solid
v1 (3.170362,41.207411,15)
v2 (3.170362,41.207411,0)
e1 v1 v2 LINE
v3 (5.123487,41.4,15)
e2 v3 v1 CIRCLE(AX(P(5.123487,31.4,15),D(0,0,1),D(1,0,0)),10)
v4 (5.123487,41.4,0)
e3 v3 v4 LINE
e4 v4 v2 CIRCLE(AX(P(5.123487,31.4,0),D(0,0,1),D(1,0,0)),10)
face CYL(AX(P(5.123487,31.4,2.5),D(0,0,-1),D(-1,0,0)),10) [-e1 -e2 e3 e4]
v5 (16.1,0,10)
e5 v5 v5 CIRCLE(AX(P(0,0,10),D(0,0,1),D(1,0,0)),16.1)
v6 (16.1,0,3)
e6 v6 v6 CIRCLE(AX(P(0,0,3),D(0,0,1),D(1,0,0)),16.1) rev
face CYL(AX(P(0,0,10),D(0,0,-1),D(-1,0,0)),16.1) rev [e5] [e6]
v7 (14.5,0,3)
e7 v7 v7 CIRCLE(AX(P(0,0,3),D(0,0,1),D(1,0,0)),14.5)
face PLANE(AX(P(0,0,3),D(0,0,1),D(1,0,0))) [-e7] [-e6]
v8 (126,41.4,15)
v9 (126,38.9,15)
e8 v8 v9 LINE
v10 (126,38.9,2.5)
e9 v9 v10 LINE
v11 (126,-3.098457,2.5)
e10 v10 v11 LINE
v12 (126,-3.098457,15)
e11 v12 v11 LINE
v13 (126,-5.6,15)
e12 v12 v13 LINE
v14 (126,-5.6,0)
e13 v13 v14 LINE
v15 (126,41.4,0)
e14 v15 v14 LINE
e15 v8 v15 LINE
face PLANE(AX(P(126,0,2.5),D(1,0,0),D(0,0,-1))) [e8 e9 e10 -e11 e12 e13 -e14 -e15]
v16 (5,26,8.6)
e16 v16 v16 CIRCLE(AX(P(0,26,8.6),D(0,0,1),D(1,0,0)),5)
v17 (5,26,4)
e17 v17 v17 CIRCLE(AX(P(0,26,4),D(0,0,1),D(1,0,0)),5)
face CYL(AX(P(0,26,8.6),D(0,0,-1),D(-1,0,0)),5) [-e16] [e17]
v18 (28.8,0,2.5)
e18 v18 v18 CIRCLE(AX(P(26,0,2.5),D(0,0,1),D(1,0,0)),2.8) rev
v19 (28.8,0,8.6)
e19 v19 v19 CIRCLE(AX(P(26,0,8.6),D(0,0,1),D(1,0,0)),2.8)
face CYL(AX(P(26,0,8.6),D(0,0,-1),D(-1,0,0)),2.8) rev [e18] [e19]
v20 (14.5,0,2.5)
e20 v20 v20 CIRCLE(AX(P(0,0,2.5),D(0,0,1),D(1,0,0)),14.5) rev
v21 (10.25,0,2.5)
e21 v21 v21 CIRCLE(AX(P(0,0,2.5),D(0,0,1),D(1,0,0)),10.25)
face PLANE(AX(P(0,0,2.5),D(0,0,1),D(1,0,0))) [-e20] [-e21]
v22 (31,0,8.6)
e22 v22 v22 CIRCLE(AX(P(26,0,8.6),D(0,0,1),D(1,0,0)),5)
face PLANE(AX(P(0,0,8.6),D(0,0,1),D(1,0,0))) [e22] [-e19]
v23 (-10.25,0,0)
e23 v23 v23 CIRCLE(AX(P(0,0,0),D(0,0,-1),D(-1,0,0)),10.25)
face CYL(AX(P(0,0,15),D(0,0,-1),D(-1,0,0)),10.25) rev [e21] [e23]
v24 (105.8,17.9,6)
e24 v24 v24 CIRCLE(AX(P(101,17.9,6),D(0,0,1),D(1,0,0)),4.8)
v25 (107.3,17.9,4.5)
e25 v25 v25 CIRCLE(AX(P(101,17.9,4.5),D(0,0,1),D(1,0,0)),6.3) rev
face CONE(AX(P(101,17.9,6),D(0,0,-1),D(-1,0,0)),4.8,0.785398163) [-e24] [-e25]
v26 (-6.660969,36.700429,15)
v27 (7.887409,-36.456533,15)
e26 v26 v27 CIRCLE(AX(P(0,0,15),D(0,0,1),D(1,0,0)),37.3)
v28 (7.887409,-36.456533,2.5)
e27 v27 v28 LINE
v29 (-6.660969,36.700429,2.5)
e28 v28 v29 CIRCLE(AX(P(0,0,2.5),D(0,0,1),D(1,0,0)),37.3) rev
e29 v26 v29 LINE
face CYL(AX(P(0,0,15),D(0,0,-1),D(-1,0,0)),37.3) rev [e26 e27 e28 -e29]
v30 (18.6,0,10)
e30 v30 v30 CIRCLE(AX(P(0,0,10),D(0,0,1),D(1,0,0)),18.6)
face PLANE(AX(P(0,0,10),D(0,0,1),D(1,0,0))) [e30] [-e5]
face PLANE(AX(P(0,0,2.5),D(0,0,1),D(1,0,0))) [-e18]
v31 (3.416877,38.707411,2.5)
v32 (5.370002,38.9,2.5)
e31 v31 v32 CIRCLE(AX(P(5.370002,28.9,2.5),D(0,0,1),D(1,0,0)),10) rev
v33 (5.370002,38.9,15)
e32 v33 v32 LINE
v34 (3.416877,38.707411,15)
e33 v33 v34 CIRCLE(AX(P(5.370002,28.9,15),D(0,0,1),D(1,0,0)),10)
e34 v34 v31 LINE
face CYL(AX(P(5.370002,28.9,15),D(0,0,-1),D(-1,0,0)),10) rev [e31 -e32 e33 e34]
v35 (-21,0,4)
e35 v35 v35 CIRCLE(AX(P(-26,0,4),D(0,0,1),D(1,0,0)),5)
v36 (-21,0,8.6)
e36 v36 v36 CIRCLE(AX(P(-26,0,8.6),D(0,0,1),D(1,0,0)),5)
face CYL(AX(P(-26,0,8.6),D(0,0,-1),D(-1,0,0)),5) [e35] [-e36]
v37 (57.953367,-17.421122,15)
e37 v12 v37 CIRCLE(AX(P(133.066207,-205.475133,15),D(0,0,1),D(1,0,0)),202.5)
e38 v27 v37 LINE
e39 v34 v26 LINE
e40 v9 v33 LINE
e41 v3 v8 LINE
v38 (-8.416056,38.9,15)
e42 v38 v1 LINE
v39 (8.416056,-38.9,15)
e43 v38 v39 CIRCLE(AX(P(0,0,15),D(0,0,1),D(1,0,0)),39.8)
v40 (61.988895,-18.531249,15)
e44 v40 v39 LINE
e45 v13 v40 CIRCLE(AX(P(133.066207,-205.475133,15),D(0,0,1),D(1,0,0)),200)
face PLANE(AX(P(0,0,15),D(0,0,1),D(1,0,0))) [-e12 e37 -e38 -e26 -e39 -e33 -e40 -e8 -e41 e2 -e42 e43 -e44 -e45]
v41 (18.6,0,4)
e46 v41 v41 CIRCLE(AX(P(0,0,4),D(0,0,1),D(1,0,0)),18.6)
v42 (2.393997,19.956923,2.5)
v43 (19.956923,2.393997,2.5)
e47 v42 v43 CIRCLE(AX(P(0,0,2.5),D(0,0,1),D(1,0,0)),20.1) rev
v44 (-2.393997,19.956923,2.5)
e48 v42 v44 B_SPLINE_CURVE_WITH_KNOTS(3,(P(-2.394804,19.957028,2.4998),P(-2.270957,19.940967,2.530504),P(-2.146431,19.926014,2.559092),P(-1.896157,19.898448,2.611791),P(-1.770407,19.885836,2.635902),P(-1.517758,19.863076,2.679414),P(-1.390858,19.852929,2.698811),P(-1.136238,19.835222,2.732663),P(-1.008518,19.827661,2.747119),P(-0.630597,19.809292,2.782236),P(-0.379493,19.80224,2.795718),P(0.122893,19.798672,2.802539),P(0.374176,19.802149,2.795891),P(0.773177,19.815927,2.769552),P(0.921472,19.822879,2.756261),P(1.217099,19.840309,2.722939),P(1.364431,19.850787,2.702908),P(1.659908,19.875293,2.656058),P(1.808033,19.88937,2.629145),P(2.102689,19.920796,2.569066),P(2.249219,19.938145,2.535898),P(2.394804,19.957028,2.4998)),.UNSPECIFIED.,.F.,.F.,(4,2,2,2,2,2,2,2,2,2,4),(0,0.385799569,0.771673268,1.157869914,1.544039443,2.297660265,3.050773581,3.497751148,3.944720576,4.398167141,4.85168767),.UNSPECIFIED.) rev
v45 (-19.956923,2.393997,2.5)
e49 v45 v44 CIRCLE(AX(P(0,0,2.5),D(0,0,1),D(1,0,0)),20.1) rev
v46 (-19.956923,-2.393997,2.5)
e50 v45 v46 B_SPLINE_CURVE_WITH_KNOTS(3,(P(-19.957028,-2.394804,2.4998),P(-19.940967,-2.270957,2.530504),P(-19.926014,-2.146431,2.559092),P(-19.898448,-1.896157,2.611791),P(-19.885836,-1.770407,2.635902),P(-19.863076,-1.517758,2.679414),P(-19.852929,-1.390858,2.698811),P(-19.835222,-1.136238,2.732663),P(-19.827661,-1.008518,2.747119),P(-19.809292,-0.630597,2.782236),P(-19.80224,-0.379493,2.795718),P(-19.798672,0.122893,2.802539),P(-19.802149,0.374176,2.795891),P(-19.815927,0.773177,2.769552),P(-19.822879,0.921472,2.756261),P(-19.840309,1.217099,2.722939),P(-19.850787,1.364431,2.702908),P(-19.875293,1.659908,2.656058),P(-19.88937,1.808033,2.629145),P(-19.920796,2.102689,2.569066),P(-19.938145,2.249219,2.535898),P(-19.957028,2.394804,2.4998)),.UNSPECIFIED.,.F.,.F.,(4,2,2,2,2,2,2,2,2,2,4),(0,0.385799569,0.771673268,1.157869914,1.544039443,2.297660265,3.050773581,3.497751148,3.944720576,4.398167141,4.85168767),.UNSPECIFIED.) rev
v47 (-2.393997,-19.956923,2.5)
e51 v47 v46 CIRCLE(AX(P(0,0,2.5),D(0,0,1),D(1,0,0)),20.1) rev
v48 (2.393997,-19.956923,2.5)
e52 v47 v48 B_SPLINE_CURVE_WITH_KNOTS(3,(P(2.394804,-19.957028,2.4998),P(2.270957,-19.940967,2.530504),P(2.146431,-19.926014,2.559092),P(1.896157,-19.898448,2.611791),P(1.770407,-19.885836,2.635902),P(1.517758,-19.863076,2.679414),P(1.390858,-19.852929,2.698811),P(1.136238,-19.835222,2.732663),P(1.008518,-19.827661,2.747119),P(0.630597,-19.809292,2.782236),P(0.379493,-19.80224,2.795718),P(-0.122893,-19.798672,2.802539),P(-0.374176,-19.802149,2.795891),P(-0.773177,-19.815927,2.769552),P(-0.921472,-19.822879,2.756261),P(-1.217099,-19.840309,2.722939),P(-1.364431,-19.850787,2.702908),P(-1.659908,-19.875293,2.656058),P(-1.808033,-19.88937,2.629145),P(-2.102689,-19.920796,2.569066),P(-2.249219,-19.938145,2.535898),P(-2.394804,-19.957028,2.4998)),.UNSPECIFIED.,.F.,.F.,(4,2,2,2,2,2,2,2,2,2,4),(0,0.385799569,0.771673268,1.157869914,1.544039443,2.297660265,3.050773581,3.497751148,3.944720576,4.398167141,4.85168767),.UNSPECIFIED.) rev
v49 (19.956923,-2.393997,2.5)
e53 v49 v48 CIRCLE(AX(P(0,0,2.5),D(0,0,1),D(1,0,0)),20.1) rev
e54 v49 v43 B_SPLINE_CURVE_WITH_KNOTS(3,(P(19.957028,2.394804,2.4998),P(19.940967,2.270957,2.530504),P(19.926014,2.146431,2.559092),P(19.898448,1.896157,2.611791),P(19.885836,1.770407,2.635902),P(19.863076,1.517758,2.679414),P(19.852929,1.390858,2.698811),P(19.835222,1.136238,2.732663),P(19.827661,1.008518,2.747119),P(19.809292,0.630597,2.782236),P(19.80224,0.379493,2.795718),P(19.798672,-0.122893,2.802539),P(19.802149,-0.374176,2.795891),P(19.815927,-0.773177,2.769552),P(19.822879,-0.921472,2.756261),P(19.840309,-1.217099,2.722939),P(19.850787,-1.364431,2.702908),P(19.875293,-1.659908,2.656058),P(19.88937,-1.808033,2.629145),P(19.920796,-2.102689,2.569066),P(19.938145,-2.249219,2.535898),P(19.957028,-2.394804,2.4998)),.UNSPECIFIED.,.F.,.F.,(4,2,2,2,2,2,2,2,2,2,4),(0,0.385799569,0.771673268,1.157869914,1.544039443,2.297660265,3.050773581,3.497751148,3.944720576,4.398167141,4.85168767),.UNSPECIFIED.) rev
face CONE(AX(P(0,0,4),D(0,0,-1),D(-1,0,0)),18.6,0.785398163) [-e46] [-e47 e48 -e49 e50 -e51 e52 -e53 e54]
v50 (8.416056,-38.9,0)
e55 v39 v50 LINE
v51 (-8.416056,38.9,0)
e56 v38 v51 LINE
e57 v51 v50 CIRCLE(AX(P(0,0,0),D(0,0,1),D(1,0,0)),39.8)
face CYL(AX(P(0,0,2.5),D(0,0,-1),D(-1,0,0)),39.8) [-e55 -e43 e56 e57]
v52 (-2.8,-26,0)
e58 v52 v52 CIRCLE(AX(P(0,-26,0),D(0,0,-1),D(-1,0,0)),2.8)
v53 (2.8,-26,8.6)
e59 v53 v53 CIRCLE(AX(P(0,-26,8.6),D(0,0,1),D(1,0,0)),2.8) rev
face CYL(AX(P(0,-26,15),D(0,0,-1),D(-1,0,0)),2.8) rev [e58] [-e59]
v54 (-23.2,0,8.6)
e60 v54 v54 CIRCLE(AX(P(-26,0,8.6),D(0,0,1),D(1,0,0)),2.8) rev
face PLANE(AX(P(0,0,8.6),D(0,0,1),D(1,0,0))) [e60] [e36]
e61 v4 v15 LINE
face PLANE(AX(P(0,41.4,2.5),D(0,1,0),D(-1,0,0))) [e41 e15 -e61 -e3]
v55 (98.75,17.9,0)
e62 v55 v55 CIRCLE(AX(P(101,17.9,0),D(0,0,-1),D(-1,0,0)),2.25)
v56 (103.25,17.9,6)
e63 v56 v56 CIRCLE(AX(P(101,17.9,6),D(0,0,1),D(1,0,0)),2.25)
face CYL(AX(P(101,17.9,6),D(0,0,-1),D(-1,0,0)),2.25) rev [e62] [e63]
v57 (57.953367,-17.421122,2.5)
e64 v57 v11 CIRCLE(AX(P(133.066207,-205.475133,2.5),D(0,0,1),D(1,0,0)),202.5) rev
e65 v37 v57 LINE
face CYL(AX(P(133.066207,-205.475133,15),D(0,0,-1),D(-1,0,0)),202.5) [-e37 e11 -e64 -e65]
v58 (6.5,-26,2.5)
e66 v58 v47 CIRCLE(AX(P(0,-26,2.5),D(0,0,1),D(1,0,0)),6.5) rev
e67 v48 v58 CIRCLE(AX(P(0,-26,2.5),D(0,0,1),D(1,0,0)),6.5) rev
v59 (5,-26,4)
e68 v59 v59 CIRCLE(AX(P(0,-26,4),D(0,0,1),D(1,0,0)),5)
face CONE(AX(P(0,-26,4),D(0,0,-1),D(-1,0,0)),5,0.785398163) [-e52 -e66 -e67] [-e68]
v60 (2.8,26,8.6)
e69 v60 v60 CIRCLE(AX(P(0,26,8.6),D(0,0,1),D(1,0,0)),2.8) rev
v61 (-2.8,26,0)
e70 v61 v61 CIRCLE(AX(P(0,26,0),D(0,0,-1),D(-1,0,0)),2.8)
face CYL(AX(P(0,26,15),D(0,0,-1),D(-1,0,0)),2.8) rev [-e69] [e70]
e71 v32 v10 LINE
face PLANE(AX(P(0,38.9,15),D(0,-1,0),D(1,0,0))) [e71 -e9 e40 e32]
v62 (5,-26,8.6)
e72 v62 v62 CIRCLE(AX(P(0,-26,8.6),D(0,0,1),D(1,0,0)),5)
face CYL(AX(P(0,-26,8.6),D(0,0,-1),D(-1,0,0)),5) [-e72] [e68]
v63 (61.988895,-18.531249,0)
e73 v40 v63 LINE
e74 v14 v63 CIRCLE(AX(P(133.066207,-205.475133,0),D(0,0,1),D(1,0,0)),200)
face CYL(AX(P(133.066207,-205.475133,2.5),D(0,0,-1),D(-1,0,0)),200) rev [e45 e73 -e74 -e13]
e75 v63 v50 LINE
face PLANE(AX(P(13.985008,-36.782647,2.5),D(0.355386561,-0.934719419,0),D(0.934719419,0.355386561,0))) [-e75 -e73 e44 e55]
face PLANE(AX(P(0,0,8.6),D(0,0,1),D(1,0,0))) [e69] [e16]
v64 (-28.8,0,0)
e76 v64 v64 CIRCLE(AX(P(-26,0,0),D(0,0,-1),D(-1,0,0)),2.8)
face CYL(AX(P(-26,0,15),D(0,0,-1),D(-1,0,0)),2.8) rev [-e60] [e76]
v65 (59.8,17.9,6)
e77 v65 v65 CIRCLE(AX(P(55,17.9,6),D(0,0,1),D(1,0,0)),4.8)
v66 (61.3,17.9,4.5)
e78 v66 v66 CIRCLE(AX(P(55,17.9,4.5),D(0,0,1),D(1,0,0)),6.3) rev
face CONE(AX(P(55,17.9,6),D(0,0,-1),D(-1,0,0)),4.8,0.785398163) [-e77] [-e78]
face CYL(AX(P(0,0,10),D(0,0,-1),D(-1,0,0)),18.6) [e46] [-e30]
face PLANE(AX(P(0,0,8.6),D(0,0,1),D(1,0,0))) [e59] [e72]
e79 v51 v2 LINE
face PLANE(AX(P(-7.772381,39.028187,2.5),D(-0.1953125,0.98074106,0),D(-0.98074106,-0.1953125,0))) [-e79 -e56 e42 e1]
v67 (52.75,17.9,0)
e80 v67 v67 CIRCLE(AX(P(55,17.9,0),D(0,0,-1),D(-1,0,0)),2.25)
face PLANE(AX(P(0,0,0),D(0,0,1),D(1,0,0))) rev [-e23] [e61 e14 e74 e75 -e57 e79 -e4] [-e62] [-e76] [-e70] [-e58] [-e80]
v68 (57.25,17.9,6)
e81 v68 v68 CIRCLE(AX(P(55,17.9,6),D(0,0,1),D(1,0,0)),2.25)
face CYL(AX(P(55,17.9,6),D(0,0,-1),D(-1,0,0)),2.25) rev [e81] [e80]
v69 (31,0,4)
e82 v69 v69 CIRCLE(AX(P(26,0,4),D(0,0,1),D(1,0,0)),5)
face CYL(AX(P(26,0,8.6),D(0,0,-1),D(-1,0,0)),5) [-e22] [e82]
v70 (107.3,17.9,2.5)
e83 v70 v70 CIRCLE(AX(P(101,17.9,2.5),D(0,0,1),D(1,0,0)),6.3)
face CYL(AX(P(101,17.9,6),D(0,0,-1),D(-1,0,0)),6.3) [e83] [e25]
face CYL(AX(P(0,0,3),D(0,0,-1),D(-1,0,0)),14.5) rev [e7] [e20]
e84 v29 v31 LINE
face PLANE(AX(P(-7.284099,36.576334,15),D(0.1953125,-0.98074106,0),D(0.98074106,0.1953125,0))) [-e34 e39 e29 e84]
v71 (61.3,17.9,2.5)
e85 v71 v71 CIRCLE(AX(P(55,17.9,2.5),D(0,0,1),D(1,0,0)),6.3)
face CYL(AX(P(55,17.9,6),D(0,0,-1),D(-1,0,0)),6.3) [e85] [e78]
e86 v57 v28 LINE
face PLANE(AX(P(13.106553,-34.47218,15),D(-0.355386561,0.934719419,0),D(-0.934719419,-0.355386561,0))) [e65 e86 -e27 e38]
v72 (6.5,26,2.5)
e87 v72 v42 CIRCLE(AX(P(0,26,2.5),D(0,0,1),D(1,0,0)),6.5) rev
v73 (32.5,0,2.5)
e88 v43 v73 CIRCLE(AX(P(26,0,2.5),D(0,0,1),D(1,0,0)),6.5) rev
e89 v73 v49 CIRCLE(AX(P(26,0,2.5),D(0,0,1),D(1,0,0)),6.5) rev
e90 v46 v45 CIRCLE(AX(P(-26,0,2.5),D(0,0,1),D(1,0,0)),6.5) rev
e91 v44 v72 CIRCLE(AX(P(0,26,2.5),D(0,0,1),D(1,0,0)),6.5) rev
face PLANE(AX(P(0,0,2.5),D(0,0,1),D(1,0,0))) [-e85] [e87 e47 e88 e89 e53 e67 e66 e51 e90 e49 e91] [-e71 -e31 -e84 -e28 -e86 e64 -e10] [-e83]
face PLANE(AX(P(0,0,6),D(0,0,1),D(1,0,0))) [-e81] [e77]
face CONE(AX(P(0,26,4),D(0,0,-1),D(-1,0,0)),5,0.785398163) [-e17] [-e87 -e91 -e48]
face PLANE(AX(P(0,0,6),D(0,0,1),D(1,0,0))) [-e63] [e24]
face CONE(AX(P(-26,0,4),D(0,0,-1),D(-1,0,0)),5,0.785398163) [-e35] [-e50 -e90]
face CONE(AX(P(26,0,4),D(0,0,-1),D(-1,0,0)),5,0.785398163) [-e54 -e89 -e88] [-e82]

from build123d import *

# Parameters (mm, degrees)
ESTRUSIONE_ESTRUSIONE1_DEPTH = 2.5
ESTRUSIONE_ESTRUSIONE2_DEPTH = 15
SCHIZZO2_R                   = 10.25
SCHIZZO2_R_2                 = 2.8
TAGLIO_ESTRUSIONE1_DEPTH     = 15
SCHIZZO3_R                   = 16.1
SCHIZZO3_R_2                 = 14.5
ESTRUSIONE_ESTRUSIONE3_DEPTH = 0.5
SCHIZZO3_3_R                 = 18.6
SCHIZZO3_3_R_2               = 16.1
ESTRUSIONE_ESTRUSIONE4_DEPTH = 7.5
SCHIZZO3_4_R                 = 5
SCHIZZO3_4_R_2               = 2.8
ESTRUSIONE_ESTRUSIONE5_DEPTH = 6.1
SCHIZZO3_5_R                 = 6.3
SCHIZZO3_5_R_2               = 2.25
ESTRUSIONE_ESTRUSIONE6_DEPTH = 3.5
SMUSSO1_SIZE                 = 1.5
FORO_PER_VITE_M4_1_D         = 4.5
FORO_PER_VITE_M4_1_DEPTH     = 50
FORO_PER_VITE_M4_1_TIP       = 1.351936393


with BuildPart() as part:
    # Schizzo1 → Estrusione-Estrusione1 (new body)
    with BuildSketch(Plane.XY):
        with BuildLine():
            Line((5.123487201, 41.4), (126, 41.4))
            Line((126, 41.4), (126, -5.6))
            ThreePointArc((126, -5.6), (93.463092461, -9.435358059), (61.98889523, -18.531249019))
            Line((61.98889523, -18.531249019), (8.416056083, -38.9))
            ThreePointArc((8.416056083, -38.9), (-38.9, -8.416056083), (-8.416056083, 38.9))
            Line((-8.416056083, 38.9), (3.170362201, 41.207410603))
            ThreePointArc((3.170362201, 41.207410603), (4.142188579, 41.351736181), (5.123487201, 41.4))
        make_face()
    extrude(amount=ESTRUSIONE_ESTRUSIONE1_DEPTH)

    # Schizzo1<3> → Estrusione-Estrusione2 (add)
    with BuildSketch(Plane.XY):
        with BuildLine():
            Line((126, 41.4), (5.123487201, 41.4))
            ThreePointArc((5.123487201, 41.4), (4.142188579, 41.351736181), (3.170362201, 41.207410603))
            Line((3.170362201, 41.207410603), (-8.416056083, 38.9))
            ThreePointArc((-8.416056083, 38.9), (-38.9, -8.416056083), (8.416056083, -38.9))
            Line((8.416056083, -38.9), (61.98889523, -18.531249019))
            ThreePointArc((61.98889523, -18.531249019), (93.463092461, -9.435358059), (126, -5.6))
            Line((126, -5.6), (126, -3.098457484))
            ThreePointArc((126, -3.098457484), (91.357291517, -7.317073844), (57.953366675, -17.421121553))
            Line((57.953366675, -17.421121553), (7.887409345, -36.456532663))
            ThreePointArc((7.887409345, -36.456532663), (-36.58362067, -7.275211244), (-6.660968885, 36.700429065))
            Line((-6.660968885, 36.700429065), (3.41687663, 38.707410603))
            ThreePointArc((3.41687663, 38.707410603), (4.388703008, 38.851736181), (5.37000163, 38.9))
            Line((5.37000163, 38.9), (126, 38.9))
            Line((126, 38.9), (126, 41.4))
        make_face()
    extrude(amount=ESTRUSIONE_ESTRUSIONE2_DEPTH)

    # Schizzo2 → Taglio-Estrusione1 (cut)
    with BuildSketch(Plane(origin=(0, 0, 0), x_dir=(-1, 0, 0), z_dir=(0, 0, -1))):
        Circle(SCHIZZO2_R)
        with Locations((0, -26)):
            Circle(SCHIZZO2_R_2)
        with Locations((26, 0)):
            Circle(SCHIZZO2_R_2)
        with Locations((0, 26)):
            Circle(SCHIZZO2_R_2)
    extrude(amount=-TAGLIO_ESTRUSIONE1_DEPTH, mode=Mode.SUBTRACT)

    # Schizzo3 → Estrusione-Estrusione3 (add)
    with BuildSketch(Plane.XY.offset(2.5)):
        Circle(SCHIZZO3_R)
        Circle(SCHIZZO3_R_2, mode=Mode.SUBTRACT)
    extrude(amount=ESTRUSIONE_ESTRUSIONE3_DEPTH)

    # Schizzo3<3> → Estrusione-Estrusione4 (add)
    with BuildSketch(Plane.XY.offset(2.5)):
        Circle(SCHIZZO3_3_R)
        Circle(SCHIZZO3_3_R_2, mode=Mode.SUBTRACT)
    extrude(amount=ESTRUSIONE_ESTRUSIONE4_DEPTH)

    # Schizzo3<4> → Estrusione-Estrusione5 (add)
    # profile 1 of 4: a face of its own
    with BuildSketch(Plane.XY.offset(2.5)):
        with Locations((-26, 0)):
            Circle(SCHIZZO3_4_R)
        with Locations(Location((-26, 0, 0), (0, 0, 180))):
            Circle(SCHIZZO3_4_R_2, mode=Mode.SUBTRACT)
    # profile 2 of 4: a face of its own
    with BuildSketch(Plane.XY.offset(2.5)):
        with Locations((0, -26)):
            Circle(SCHIZZO3_4_R)
        with Locations(Location((0, -26, 0), (0, 0, 180))):
            Circle(SCHIZZO3_4_R_2, mode=Mode.SUBTRACT)
    # profile 3 of 4: a face of its own
    with BuildSketch(Plane.XY.offset(2.5)):
        with Locations((26, 0)):
            Circle(SCHIZZO3_4_R)
        with Locations((26, 0)):
            Circle(SCHIZZO3_4_R_2, mode=Mode.SUBTRACT)
    # profile 4 of 4: a face of its own
    with BuildSketch(Plane.XY.offset(2.5)):
        with Locations((0, 26)):
            Circle(SCHIZZO3_4_R)
        with Locations(Location((0, 26, 0), (0, 0, 180))):
            Circle(SCHIZZO3_4_R_2, mode=Mode.SUBTRACT)
    extrude(amount=ESTRUSIONE_ESTRUSIONE5_DEPTH)

    # Schizzo3<5> → Estrusione-Estrusione6 (add)
    # profile 1 of 2: a face of its own
    with BuildSketch(Plane.XY.offset(2.5)):
        with Locations((55, 17.9)):
            Circle(SCHIZZO3_5_R)
        with Locations((55, 17.9)):
            Circle(SCHIZZO3_5_R_2, mode=Mode.SUBTRACT)
    # profile 2 of 2: a face of its own
    with BuildSketch(Plane.XY.offset(2.5)):
        with Locations((101, 17.9)):
            Circle(SCHIZZO3_5_R)
        with Locations((101, 17.9)):
            Circle(SCHIZZO3_5_R_2, mode=Mode.SUBTRACT)
    extrude(amount=ESTRUSIONE_ESTRUSIONE6_DEPTH)

    # Smusso1
    # the kernel refuses this chamfer: 1.5 mm, written as the material it adds along each edge
    with BuildSketch(Plane(origin=(0, 0, 2.5), x_dir=(1, 0, 0), z_dir=(0, -1, 0))) as smusso1_piece_1:
        Polygon((18.6 + SMUSSO1_SIZE, 0), (18.6, SMUSSO1_SIZE), (18.6, 0), align=None)
    revolve(axis=Axis((0, 0, 2.5), (0, 0, 1)))
    with BuildSketch(Plane(origin=(-26, 0, 2.5), x_dir=(1, 0, 0), z_dir=(0, -1, 0))) as smusso1_piece_2:
        Polygon((5 + SMUSSO1_SIZE, 0), (5, SMUSSO1_SIZE), (5, 0), align=None)
    revolve(axis=Axis((-26, 0, 2.5), (0, 0, 1)))
    with BuildSketch(Plane(origin=(0, -26, 2.5), x_dir=(1, 0, 0), z_dir=(0, -1, 0))) as smusso1_piece_3:
        Polygon((5 + SMUSSO1_SIZE, 0), (5, SMUSSO1_SIZE), (5, 0), align=None)
    revolve(axis=Axis((0, -26, 2.5), (0, 0, 1)))
    with BuildSketch(Plane(origin=(26, 0, 2.5), x_dir=(1, 0, 0), z_dir=(0, -1, 0))) as smusso1_piece_4:
        Polygon((5 + SMUSSO1_SIZE, 0), (5, SMUSSO1_SIZE), (5, 0), align=None)
    revolve(axis=Axis((26, 0, 2.5), (0, 0, 1)))
    with BuildSketch(Plane(origin=(0, 26, 2.5), x_dir=(1, 0, 0), z_dir=(0, -1, 0))) as smusso1_piece_5:
        Polygon((5 + SMUSSO1_SIZE, 0), (5, SMUSSO1_SIZE), (5, 0), align=None)
    revolve(axis=Axis((0, 26, 2.5), (0, 0, 1)))
    # the kernel refuses this chamfer: 1.5 mm, written as the material it takes off along each edge
    with BuildSketch(Plane(origin=(55, 17.9, 6), x_dir=(1, 0, 0), z_dir=(0, -1, 0))) as smusso1_2_piece_1:
        Polygon((6.3, -SMUSSO1_SIZE), (6.3 - SMUSSO1_SIZE, 0), (6.3, 0), align=None)
    revolve(axis=Axis((55, 17.9, 6), (0, 0, 1)), mode=Mode.SUBTRACT)
    with BuildSketch(Plane(origin=(101, 17.9, 6), x_dir=(1, 0, 0), z_dir=(0, -1, 0))) as smusso1_2_piece_2:
        Polygon((6.3, -SMUSSO1_SIZE), (6.3 - SMUSSO1_SIZE, 0), (6.3, 0), align=None)
    revolve(axis=Axis((101, 17.9, 6), (0, 0, 1)), mode=Mode.SUBTRACT)

    # Foro per Vite M4-1
    with Locations(Plane(origin=(55, 17.9, 0), x_dir=(-1, 0, 0), z_dir=(0, 0, -1))):
        with Locations((0, 0), (-46, 0)):
            Hole(FORO_PER_VITE_M4_1_D / 2, depth=FORO_PER_VITE_M4_1_DEPTH)
            with Locations((0, 0, -(FORO_PER_VITE_M4_1_DEPTH + FORO_PER_VITE_M4_1_TIP / 2))):  # 118° drill point
                Cone(0, FORO_PER_VITE_M4_1_D / 2, FORO_PER_VITE_M4_1_TIP, mode=Mode.SUBTRACT)


solid = part.part
